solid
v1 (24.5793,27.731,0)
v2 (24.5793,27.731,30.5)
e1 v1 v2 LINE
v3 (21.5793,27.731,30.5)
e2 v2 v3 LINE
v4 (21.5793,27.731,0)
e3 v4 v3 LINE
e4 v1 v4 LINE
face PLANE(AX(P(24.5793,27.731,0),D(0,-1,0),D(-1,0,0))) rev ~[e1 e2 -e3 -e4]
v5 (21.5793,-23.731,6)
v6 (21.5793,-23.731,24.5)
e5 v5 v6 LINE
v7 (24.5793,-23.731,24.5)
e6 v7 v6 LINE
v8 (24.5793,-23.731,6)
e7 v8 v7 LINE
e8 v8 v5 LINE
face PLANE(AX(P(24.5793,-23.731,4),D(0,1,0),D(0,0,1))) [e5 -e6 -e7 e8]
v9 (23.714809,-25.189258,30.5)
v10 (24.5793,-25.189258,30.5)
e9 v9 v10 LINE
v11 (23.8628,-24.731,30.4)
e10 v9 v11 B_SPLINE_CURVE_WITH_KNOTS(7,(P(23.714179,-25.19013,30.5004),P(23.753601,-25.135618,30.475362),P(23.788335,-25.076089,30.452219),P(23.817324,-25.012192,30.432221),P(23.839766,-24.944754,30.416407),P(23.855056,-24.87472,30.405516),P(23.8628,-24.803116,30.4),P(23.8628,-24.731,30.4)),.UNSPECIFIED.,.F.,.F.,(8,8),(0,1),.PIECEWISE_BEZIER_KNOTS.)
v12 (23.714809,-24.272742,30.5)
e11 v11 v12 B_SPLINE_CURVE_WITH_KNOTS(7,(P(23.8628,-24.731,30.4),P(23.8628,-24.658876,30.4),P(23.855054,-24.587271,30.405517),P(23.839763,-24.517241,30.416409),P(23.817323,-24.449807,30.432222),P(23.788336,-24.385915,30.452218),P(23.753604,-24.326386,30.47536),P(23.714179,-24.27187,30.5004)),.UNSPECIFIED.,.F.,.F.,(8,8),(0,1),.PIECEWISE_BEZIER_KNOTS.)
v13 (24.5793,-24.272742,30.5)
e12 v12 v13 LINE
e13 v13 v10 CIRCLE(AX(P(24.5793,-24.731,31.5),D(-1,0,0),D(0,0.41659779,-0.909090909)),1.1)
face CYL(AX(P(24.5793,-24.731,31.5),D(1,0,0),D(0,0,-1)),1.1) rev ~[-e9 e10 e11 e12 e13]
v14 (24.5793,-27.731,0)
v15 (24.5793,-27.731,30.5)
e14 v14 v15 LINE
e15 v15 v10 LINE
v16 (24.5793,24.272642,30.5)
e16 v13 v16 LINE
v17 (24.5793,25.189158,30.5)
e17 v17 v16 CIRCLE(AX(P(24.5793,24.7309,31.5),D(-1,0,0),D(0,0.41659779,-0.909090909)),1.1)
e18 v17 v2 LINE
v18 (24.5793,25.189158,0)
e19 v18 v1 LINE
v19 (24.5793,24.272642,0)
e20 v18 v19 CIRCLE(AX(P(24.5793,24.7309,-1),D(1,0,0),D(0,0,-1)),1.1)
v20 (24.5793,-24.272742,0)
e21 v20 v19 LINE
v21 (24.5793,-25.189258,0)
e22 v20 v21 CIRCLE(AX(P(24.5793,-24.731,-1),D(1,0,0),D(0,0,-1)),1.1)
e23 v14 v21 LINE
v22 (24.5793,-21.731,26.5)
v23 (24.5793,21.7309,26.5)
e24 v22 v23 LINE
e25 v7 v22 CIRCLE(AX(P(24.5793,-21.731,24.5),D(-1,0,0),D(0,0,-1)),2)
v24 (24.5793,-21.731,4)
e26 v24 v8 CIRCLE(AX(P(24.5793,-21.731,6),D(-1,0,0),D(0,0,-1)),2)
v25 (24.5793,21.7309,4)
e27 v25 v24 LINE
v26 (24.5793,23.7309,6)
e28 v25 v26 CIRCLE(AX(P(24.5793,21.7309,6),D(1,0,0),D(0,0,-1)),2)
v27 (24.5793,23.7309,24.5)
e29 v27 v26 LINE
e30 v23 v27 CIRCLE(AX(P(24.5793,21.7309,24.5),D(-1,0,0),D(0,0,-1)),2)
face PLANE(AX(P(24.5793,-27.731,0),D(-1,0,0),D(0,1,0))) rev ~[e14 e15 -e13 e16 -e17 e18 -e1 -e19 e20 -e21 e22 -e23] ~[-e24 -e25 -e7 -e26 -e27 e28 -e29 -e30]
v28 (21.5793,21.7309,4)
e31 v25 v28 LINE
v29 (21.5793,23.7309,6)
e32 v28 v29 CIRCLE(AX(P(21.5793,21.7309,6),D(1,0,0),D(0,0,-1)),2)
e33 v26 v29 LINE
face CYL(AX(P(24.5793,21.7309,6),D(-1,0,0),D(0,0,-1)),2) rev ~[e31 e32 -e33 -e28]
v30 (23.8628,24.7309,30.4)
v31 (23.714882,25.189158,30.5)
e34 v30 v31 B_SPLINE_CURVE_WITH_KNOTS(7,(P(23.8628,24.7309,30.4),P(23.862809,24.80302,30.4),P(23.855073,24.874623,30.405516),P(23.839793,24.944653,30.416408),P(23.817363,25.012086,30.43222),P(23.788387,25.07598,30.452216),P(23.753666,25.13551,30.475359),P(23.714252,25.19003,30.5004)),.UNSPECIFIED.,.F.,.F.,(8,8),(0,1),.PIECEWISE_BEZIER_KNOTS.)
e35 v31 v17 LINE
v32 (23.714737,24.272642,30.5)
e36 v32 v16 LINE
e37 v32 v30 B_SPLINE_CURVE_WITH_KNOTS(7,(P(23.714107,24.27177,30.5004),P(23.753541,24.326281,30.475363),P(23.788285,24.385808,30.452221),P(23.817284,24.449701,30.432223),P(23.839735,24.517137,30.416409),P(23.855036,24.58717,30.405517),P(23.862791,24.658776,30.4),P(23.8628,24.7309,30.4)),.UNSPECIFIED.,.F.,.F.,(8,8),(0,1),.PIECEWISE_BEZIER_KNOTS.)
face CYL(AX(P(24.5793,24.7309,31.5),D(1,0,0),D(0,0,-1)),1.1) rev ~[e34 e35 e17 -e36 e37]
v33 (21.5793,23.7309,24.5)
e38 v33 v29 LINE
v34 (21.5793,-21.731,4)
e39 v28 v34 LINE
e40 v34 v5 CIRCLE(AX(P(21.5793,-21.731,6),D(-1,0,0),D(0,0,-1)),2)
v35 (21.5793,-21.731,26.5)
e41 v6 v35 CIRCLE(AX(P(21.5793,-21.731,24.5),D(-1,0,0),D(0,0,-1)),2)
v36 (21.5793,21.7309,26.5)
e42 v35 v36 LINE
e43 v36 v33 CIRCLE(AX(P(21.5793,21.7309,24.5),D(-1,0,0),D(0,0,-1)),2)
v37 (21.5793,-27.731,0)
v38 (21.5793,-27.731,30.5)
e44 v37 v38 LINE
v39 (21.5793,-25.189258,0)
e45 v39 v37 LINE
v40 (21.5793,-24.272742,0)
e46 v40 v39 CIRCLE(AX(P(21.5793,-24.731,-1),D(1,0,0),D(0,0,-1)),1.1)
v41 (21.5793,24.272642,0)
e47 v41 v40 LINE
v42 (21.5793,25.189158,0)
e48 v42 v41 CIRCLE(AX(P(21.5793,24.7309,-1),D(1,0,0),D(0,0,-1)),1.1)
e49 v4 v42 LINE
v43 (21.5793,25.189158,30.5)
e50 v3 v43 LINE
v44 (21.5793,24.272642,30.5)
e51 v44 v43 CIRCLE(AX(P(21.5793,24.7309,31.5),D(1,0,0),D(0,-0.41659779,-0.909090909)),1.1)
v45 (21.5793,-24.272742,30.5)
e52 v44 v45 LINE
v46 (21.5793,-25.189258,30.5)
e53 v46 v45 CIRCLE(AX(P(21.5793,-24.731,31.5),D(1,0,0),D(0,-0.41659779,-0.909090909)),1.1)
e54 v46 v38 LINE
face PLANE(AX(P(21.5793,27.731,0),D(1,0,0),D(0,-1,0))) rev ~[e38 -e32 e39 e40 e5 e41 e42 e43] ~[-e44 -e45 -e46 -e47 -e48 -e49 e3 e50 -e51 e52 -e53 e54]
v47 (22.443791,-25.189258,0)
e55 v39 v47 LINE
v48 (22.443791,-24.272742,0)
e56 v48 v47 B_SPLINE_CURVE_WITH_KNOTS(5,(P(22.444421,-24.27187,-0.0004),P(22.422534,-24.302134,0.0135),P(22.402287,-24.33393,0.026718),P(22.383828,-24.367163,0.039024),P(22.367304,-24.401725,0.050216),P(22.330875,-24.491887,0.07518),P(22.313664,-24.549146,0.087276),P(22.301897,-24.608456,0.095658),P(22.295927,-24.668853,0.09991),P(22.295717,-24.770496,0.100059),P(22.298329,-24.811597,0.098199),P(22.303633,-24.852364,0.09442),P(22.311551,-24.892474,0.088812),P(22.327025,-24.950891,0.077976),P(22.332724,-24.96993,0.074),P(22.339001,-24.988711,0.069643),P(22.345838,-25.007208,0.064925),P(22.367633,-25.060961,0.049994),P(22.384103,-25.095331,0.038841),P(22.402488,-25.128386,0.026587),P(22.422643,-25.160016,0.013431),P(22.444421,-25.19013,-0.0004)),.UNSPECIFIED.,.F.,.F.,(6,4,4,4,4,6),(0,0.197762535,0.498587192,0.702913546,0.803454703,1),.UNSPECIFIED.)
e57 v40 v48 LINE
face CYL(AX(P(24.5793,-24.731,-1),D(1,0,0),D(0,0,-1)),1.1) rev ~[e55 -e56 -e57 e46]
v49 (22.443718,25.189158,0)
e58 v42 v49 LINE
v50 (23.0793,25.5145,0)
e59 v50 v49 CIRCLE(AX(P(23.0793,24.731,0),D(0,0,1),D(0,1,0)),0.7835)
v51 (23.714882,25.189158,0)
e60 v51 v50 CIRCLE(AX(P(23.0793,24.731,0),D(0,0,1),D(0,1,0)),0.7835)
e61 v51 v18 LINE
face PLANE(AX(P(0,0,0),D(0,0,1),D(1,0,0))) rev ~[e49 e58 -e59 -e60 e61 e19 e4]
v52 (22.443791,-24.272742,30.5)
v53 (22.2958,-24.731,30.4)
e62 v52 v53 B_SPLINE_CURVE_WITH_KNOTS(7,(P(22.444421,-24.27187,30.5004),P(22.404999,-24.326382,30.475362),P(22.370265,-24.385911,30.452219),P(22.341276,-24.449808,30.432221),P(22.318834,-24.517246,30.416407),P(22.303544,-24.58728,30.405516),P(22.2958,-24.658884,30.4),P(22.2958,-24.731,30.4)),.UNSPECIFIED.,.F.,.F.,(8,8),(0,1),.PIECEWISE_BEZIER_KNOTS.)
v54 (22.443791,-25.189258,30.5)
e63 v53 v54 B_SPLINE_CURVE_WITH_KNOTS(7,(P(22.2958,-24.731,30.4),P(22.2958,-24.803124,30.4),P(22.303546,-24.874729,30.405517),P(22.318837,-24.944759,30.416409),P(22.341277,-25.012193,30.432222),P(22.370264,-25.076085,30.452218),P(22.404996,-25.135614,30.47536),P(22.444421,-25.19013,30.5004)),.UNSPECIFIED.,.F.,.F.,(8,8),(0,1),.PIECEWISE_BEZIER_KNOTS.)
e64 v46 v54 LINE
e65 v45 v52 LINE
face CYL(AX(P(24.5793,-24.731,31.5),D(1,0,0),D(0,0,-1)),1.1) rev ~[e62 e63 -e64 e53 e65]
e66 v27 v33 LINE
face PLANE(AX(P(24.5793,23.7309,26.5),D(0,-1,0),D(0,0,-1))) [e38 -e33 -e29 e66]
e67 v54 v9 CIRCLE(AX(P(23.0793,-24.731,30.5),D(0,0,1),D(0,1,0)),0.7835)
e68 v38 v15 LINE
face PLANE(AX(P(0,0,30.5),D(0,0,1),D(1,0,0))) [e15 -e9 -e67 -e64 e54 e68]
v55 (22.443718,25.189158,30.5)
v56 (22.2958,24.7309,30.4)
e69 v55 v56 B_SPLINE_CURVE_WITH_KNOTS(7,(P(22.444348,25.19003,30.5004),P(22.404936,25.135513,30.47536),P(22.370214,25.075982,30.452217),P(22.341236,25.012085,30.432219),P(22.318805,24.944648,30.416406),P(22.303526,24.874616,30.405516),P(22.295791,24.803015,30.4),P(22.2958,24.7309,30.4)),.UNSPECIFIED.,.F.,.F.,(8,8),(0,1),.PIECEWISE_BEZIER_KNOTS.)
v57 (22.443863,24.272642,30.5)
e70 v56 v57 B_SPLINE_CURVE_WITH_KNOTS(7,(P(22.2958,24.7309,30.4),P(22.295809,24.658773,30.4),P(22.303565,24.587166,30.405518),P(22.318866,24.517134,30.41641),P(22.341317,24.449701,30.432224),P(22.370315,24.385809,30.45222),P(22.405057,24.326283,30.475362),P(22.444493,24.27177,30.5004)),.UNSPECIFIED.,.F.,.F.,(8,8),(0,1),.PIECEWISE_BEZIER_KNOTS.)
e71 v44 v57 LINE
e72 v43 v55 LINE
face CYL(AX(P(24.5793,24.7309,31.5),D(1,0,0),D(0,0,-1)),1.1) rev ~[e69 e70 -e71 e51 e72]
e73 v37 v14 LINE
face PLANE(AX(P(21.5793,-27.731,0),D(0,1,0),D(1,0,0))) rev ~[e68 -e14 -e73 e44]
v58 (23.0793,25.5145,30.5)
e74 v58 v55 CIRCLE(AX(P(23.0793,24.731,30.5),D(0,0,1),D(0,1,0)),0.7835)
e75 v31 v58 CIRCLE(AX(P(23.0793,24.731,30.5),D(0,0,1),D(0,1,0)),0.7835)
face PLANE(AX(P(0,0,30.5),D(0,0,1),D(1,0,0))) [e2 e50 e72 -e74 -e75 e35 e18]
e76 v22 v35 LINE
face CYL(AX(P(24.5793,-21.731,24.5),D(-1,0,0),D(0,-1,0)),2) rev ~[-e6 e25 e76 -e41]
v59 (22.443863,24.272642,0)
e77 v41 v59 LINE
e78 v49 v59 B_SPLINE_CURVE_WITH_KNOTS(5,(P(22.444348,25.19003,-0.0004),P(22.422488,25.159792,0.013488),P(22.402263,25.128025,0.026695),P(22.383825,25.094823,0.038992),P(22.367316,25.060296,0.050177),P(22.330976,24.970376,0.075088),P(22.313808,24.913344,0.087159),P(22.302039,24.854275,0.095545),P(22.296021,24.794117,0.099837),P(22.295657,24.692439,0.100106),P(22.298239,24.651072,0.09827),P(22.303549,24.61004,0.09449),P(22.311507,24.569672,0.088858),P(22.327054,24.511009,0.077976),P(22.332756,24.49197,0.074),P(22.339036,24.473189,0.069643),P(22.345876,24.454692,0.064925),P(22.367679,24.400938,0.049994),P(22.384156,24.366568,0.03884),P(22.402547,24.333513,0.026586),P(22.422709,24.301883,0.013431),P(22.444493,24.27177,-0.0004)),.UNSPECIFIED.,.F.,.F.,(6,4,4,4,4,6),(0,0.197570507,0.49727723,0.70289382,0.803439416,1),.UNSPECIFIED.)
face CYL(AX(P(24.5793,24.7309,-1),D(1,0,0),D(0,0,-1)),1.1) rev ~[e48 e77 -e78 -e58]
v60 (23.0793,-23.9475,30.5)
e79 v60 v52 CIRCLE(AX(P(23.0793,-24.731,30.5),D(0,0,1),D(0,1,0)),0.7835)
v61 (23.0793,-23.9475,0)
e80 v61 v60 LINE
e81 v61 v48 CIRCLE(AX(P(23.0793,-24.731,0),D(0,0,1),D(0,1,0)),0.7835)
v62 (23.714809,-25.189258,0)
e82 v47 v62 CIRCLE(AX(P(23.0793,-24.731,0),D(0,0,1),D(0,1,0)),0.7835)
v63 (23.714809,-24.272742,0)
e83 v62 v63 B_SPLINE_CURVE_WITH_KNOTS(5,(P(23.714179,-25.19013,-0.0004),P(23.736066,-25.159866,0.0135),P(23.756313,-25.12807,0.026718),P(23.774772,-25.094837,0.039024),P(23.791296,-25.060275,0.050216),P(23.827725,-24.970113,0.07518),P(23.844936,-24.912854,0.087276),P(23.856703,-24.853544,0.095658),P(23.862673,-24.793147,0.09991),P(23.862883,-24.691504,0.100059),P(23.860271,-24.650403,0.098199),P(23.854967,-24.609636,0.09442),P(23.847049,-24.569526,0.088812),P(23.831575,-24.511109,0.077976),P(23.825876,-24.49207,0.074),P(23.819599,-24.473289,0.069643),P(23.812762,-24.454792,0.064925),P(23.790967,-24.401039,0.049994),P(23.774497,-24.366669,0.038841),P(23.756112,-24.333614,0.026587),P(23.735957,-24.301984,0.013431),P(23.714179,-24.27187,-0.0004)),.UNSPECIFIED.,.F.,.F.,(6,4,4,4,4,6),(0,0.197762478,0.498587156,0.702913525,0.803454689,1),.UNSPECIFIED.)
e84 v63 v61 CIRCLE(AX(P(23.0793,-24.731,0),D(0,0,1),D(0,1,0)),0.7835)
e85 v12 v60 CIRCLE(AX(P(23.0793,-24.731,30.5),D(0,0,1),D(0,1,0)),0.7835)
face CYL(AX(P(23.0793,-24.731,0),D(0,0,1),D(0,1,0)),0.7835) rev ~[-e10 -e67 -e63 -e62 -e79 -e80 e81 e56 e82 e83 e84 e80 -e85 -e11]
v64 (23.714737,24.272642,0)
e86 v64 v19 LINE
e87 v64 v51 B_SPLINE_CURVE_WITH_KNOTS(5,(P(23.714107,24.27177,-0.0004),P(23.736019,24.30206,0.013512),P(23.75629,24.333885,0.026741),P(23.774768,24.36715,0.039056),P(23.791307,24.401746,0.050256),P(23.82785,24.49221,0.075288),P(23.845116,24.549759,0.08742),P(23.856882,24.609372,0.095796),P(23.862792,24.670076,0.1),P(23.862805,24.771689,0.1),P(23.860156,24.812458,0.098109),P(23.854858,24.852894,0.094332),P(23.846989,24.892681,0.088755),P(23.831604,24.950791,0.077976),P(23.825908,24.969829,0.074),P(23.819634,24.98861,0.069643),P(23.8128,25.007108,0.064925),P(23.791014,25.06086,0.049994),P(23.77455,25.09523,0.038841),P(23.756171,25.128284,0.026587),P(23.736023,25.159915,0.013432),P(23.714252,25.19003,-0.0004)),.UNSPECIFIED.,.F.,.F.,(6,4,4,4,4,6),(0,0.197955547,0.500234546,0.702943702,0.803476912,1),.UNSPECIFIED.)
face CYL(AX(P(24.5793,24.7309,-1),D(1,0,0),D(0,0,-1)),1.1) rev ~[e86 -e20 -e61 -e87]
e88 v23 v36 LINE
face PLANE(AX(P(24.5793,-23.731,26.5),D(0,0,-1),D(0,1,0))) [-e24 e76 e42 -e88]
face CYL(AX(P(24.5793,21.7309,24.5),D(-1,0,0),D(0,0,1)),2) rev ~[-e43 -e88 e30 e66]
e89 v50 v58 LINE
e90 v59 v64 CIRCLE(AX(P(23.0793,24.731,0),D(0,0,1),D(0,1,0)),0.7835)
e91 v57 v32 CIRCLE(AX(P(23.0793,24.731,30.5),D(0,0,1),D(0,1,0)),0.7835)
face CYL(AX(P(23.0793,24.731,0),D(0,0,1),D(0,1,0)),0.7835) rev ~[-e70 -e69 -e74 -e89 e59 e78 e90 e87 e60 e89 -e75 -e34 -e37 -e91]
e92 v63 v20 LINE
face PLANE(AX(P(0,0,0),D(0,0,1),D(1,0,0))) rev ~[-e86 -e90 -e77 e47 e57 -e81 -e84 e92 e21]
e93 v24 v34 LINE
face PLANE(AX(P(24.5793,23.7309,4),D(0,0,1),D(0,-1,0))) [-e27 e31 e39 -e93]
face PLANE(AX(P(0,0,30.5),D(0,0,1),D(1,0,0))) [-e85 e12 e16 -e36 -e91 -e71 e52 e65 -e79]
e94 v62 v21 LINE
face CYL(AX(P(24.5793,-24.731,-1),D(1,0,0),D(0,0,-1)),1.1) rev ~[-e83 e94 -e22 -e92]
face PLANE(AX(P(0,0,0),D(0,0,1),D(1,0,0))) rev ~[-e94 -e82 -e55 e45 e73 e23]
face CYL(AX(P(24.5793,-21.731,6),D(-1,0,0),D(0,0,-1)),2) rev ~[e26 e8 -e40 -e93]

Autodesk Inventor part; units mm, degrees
ref_plane "YZ Plane" through (0, 0, 0) normal (1, 0, 0) x (0, 1, 0)
ref_plane "XZ Plane" through (0, 0, 0) normal (0, 1, 0) x (-1, 0, 0)
sketch "スケッチ1" plane through (0, 0, 0) normal (0, 0, 1) x (1, 0, 0)
  circle A0 centre (23.0793, 24.731) radius 1.1 projected
  circle A1 centre (23.0793, -24.731) radius 1.1 projected
  line L0 (24.5793, 27.731) -> (21.5793, 27.731)
  line L1 (21.5793, 27.731) -> (21.5793, -27.731)
  line L2 (21.5793, -27.731) -> (24.5793, -27.731)
  line L3 (24.5793, -27.731) -> (24.5793, 27.731)
  point P0 (0, 0)
  point P1 (23.0793, 27.731)
  dimension "d0" = 3
  dimension "d1" = 3
  dimension "d2" = 3
ref_plane "作業平面1" through (-53.6786, -65.4442, 30.5) normal (0, 0, -1) x (0.7071068, 0.7071068, 0)
extrude "押し出し1" add sketch "スケッチ1" along normal up to surface (30.5 mm away) contours A0 | A1 | L3 L2 L1 L0
sketch "スケッチ2" plane through (0, 0, 0) normal (0, 0, -1) x (-1, 0, 0)
  circle A0 centre (-23.0793, 24.731) radius 1.1 projected
  circle A1 centre (-23.0793, -24.731) radius 1.1 projected
  point P0 (0, 0)
hole "穴1" at (23.0793, 24.731, 0) at (23.0793, -24.731, 0) direction (0, 0, 1) diameter 1.567 end through all thread size "M2x0.4" class "6H" standard "ISO Metric profile"
sketch "スケッチ3" plane through (24.5793, -27.731, 0) normal (1, 0, 0) x (0, 0, -1)
  line L0 (-30.5, 0) -> (-30.5, 55.4619) projected
  line L1 (0, 0) -> (-30.5, 0) projected
  line L2 (0, 0) -> (0, 55.4619) projected
  line L3 (0, 55.4619) -> (-30.5, 55.4619) projected
  line L4 (-4, 51.4619) -> (-4, 4)
  line L5 (-4, 4) -> (-26.5, 4)
  line L6 (-26.5, 4) -> (-26.5, 51.4619)
  line L7 (-26.5, 51.4619) -> (-4, 51.4619)
  point P0 (0, 27.731)
  dimension "d12" = 4
extrude "押し出し2" cut sketch "スケッチ3" against normal through all contours L4 L5 L6 L7
fillet "フィレット1" radius 2 4 edges at (23.0793, 23.731, 26.5) (23.0793, 23.731, 4) (23.0793, -23.731, 26.5) (23.0793, -23.731, 4)
sketch "スケッチ4" plane through (24.5793, -27.731, 0) normal (1, 0, 0) x (0, 0, -1)
  line L0 (0, 53.2454) -> (0, 51.6784) construction
  line L1 (0, 3.7835) -> (0, 2.2165) construction
  line L2 (-30.5, 4.1) -> (-30.5, 1.9) construction
  line L3 (-30.5, 51.6784) -> (-30.5, 53.2454) construction
  circle A0 centre (-31.5, 52.4619) radius 1.1
  line L4 (0, 27.731) -> (-30.5, 27.731) construction
  line L5 (-30.5, 0) -> (-30.5, 55.4619) construction
  line L6 (-15.25, 27.731) -> (-15.25, 0) construction
  line L7 (0, 0) -> (-30.5, 0) construction
  circle A1 centre (-31.5, 3) radius 1.1
  circle A2 centre (1, 52.4619) radius 1.1
  circle A3 centre (1, 3) radius 1.1
  point P0 (-30.5, 52.4619)
  dimension "d16" = 2.2
  dimension "d17" = 1
extrude "押し出し3" cut sketch "スケッチ4" against normal through all
equation "\"d2\" = d1"
properties part number "kosinosita"
